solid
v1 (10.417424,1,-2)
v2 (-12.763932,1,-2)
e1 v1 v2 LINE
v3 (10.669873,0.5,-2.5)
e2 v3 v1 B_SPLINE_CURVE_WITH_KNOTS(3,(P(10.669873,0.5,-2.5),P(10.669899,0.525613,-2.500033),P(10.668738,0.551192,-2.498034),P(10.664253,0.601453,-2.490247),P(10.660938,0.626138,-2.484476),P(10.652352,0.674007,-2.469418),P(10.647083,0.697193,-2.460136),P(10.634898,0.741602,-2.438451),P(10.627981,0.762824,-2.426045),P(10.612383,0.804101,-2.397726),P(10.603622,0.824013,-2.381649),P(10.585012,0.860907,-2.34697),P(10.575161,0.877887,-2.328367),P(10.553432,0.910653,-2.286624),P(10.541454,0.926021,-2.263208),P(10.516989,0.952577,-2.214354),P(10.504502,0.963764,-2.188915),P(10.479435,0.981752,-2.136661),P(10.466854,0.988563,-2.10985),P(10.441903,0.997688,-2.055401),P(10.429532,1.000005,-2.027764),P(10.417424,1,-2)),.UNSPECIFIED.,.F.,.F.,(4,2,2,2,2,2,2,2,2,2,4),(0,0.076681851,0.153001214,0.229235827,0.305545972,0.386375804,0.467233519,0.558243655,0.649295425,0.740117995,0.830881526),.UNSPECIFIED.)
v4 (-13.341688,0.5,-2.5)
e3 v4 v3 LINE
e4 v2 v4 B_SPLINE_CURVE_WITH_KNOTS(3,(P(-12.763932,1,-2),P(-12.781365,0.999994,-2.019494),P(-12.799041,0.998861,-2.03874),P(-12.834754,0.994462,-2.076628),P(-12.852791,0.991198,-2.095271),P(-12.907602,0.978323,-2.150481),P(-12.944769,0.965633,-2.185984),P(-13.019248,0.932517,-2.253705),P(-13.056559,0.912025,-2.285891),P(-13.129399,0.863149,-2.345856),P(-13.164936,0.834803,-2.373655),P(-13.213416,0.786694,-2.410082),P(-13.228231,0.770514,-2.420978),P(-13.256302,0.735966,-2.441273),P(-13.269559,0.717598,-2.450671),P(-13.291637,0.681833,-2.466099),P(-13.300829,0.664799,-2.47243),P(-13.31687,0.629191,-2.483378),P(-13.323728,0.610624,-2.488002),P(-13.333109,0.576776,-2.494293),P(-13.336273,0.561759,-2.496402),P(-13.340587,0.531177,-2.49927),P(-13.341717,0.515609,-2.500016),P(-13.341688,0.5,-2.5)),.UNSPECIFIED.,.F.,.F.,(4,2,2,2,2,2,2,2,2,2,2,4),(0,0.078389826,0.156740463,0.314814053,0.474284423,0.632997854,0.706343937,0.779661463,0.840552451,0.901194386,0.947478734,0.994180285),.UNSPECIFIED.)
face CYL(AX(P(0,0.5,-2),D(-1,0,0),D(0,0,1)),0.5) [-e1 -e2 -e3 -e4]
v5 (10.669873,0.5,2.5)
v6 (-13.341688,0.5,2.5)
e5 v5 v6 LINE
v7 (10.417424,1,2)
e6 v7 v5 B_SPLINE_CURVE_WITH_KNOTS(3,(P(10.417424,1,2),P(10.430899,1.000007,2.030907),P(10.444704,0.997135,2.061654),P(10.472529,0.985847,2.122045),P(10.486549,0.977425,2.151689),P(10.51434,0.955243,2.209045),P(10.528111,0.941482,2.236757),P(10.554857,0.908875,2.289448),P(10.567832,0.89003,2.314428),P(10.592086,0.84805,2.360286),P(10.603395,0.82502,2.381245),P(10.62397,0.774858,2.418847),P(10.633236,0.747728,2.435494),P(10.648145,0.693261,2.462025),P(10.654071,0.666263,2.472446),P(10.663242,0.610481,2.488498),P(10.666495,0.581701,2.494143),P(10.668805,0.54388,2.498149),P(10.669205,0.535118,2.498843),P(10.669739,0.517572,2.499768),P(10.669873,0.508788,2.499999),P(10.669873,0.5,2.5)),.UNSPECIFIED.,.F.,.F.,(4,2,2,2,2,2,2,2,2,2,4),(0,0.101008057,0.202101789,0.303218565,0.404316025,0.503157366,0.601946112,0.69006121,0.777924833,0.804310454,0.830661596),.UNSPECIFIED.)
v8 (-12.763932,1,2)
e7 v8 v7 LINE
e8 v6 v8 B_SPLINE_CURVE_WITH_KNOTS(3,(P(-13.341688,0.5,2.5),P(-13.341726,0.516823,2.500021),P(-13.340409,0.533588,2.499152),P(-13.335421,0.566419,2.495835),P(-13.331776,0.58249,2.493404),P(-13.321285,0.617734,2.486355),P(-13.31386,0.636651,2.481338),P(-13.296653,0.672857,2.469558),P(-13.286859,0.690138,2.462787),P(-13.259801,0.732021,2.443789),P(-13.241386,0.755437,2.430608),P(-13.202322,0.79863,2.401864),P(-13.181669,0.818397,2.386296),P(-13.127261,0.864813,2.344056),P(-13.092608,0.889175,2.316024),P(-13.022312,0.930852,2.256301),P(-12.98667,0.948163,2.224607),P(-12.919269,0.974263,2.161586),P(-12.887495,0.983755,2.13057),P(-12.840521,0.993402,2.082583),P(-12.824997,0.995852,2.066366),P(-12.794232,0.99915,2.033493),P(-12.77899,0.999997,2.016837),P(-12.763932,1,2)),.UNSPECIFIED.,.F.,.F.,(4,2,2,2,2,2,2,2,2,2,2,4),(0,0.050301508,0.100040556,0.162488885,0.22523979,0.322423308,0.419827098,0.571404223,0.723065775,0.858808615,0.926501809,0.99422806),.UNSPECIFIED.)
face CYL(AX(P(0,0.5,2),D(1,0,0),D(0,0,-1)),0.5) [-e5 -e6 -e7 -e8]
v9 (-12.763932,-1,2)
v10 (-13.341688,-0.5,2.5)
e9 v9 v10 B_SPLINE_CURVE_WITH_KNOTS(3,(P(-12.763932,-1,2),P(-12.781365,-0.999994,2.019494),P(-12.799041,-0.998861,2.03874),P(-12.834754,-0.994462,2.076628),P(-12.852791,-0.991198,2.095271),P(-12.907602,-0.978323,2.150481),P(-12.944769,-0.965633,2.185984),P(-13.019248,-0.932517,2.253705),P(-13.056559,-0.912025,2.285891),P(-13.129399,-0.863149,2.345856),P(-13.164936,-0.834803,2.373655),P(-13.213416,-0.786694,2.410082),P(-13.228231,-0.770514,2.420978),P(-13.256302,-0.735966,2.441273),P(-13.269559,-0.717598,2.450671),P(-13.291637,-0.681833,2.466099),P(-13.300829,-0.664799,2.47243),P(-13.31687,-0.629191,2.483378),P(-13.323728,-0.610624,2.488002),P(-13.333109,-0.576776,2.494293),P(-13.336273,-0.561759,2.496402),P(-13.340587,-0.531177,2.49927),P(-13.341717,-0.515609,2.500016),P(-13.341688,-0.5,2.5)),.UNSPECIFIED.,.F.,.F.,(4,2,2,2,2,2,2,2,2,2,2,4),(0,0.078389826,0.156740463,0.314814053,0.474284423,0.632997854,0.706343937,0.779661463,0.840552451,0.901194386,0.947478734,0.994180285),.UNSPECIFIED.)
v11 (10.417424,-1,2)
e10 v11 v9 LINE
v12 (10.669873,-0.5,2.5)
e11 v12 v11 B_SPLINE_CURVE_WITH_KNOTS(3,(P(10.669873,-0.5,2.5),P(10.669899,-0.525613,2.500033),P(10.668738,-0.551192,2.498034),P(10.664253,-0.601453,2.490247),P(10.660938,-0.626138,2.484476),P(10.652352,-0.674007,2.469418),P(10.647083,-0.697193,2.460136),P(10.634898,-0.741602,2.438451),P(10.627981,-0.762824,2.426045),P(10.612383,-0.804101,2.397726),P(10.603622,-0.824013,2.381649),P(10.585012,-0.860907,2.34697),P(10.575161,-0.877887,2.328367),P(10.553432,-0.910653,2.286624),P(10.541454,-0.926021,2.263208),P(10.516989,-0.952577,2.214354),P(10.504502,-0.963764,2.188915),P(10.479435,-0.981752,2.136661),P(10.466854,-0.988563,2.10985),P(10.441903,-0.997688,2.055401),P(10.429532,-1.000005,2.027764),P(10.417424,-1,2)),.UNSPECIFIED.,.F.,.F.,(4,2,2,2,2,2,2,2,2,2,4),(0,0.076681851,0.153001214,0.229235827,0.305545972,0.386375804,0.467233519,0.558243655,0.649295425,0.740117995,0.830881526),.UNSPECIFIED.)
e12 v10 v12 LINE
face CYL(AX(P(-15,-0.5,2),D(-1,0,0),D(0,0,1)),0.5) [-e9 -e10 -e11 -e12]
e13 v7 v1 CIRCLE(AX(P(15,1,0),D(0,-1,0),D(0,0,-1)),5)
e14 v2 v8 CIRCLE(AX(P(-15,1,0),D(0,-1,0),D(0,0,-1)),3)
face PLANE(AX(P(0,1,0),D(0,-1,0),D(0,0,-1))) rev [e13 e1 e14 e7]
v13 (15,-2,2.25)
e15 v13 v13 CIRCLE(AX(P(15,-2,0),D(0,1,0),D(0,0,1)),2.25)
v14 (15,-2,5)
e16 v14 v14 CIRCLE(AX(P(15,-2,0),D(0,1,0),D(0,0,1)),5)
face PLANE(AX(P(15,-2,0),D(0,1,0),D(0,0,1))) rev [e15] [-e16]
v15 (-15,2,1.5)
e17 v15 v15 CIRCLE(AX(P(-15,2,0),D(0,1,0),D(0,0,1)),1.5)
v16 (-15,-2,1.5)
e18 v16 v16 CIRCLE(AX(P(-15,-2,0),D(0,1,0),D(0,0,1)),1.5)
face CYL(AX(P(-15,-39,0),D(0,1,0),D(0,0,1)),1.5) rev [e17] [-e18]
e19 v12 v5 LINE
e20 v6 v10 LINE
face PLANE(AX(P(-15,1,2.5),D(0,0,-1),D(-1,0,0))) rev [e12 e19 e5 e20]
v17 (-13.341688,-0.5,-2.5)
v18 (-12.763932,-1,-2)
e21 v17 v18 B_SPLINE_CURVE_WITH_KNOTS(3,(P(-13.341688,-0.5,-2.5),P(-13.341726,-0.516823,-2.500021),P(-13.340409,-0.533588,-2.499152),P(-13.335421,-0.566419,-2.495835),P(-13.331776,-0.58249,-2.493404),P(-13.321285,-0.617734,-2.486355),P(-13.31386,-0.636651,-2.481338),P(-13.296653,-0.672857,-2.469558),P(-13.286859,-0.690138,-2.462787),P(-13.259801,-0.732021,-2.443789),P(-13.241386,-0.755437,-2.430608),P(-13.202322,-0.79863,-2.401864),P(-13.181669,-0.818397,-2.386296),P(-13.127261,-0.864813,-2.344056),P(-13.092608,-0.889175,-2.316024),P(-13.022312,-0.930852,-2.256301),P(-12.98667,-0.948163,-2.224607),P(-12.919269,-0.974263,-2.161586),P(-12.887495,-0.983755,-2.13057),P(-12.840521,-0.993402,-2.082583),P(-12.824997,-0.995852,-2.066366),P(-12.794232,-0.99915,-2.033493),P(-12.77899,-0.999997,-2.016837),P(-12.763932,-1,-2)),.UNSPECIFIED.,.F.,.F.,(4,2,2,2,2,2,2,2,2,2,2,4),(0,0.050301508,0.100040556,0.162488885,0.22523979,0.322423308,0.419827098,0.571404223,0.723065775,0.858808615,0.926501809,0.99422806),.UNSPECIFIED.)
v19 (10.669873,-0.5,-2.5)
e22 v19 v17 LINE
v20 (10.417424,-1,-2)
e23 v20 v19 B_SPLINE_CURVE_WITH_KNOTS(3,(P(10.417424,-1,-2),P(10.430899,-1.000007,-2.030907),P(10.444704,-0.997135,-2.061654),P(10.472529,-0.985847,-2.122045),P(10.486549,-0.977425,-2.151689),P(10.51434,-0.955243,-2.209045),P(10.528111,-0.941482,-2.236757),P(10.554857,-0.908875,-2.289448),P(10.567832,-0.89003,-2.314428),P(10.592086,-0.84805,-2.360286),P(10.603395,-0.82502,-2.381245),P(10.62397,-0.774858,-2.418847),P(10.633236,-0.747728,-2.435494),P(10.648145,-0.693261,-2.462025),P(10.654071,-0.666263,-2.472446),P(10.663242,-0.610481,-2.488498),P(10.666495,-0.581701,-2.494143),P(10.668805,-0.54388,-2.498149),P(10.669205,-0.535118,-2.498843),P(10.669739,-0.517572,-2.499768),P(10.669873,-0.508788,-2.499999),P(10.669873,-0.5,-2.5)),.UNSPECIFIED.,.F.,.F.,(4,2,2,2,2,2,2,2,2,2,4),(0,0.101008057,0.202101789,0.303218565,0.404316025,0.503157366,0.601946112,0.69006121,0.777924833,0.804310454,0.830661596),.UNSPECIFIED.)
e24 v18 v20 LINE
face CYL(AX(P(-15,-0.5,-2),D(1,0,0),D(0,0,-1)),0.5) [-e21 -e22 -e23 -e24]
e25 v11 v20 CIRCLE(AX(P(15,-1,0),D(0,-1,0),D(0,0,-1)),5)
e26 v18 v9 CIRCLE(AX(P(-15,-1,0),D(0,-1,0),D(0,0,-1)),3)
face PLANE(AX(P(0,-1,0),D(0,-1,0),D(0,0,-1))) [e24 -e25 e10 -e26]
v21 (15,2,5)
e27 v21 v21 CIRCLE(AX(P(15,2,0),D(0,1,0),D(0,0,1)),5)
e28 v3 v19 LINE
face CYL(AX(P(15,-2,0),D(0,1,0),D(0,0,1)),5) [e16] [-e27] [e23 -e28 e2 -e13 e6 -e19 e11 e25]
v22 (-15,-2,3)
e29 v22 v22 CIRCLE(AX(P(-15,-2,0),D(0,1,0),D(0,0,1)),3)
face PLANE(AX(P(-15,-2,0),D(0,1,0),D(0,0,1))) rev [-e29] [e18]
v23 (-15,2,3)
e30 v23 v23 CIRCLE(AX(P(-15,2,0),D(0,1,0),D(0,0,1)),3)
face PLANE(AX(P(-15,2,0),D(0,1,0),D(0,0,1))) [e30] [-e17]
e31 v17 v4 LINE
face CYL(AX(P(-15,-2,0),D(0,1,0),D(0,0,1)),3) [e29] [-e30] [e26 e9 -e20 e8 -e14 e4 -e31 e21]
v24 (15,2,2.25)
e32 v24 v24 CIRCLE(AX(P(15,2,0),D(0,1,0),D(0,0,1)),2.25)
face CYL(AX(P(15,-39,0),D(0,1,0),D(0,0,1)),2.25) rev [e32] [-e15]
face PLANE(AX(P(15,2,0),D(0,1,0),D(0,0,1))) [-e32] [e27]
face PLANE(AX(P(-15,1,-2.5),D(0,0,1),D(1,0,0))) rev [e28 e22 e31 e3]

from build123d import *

# Parameters (mm, degrees)
SKETCH1_W                = 30
SKETCH1_H                = 5
BOSS_EXTRUDE2_DEPTH      = 1
BOSS_EXTRUDE3_DEPTH      = 1
BOSS_EXTRUDE3_DEPTH_BACK = 3
SKETCH2_R                = 3
SKETCH2_R_2              = 5
SKETCH3_R                = 1.5
SKETCH3_R_2              = 2.25
CUT_EXTRUDE1_DEPTH       = 41
FILLET1_R                = 0.5
FILLET2_R                = 0.5


with BuildPart() as part:
    # Sketch1 → Boss-Extrude2 (new, symmetric)
    with BuildSketch(Plane(origin=(0, 0, 0), x_dir=(1, 0, 0), z_dir=(0, 1, 0))):
        Rectangle(SKETCH1_W, SKETCH1_H)
    extrude(amount=BOSS_EXTRUDE2_DEPTH, both=True)

    # Sketch2 → Boss-Extrude3 (add, two sides: drawn at the far end of the back side and taken through both)
    with BuildSketch(Plane(origin=(0, 1, 0), x_dir=(1, 0, 0), z_dir=(0, 1, 0)).offset(-BOSS_EXTRUDE3_DEPTH_BACK)):
        with Locations(Location((-15, 0, 0), (0, 0, 270))):
            Circle(SKETCH2_R)
        with Locations(Location((15, 0, 0), (0, 0, 270))):
            Circle(SKETCH2_R_2)
    extrude(amount=BOSS_EXTRUDE3_DEPTH + BOSS_EXTRUDE3_DEPTH_BACK)

    # Sketch3 → Cut-Extrude1 (cut)
    with BuildSketch(Plane(origin=(0, 2, 0), x_dir=(1, 0, 0), z_dir=(0, 1, 0))):
        with Locations(Location((-15, 0, 0), (0, 0, 270))):
            Circle(SKETCH3_R)
        with Locations(Location((15, 0, 0), (0, 0, 270))):
            Circle(SKETCH3_R_2)
    extrude(amount=-CUT_EXTRUDE1_DEPTH, mode=Mode.SUBTRACT)

    # Fillet1
    # the kernel refuses this fillet: 0.5 mm, written as the material it takes off along each edge
    with BuildSketch(Plane(origin=(-14.591687605, 1, 2.5), x_dir=(0, -1, 0), z_dir=(1, 0, 0))) as fillet1_piece_1_section:
        with BuildLine():
            CenterArc((FILLET1_R, FILLET1_R), FILLET1_R, 180, 90)
            Line((0, FILLET1_R), (0, 0))
            Line((0, 0), (FILLET1_R, 0))
        make_face()
    fillet1_piece_1 = extrude(amount=26.511560586, mode=Mode.PRIVATE)
    fillet1_piece_1 = fillet1_piece_1 - Plane(origin=(-15, 0.886280148, 0), x_dir=(0, 0, 1), z_dir=(0, 1, 0)) * Cylinder(3, 56, mode=Mode.PRIVATE)
    fillet1_piece_1 = fillet1_piece_1 - Plane(origin=(15, 0.886280148, 0), x_dir=(0, 0, 1), z_dir=(0, 1, 0)) * Cylinder(5, 56, mode=Mode.PRIVATE)
    add(fillet1_piece_1, mode=Mode.SUBTRACT)
    with BuildSketch(Plane(origin=(11.919872981, 1, -2.5), x_dir=(0, 0, 1), z_dir=(-1, 0, 0))) as fillet1_piece_2_section:
        with BuildLine():
            CenterArc((FILLET1_R, -FILLET1_R), FILLET1_R, 90, 90)
            Line((0, -FILLET1_R), (0, 0))
            Line((0, 0), (FILLET1_R, 0))
        make_face()
    fillet1_piece_2 = extrude(amount=26.511560586, mode=Mode.PRIVATE)
    fillet1_piece_2 = fillet1_piece_2 - Plane(origin=(-15, 0.88627951, 0), x_dir=(0, 0, 1), z_dir=(0, 1, 0)) * Cylinder(3, 56, mode=Mode.PRIVATE)
    fillet1_piece_2 = fillet1_piece_2 - Plane(origin=(15, 0.88627951, 0), x_dir=(0, 0, 1), z_dir=(0, -1, 0)) * Cylinder(5, 56, mode=Mode.PRIVATE)
    add(fillet1_piece_2, mode=Mode.SUBTRACT)

    # Fillet2
    fillet2_edges = [part.edges().sort_by_distance(p)[0] for p in [
        (-1.335907312, -1, 2.5),
        (-1.335907312, -1, -2.5),
    ]]
    fillet(fillet2_edges, radius=FILLET2_R)


solid = part.part
